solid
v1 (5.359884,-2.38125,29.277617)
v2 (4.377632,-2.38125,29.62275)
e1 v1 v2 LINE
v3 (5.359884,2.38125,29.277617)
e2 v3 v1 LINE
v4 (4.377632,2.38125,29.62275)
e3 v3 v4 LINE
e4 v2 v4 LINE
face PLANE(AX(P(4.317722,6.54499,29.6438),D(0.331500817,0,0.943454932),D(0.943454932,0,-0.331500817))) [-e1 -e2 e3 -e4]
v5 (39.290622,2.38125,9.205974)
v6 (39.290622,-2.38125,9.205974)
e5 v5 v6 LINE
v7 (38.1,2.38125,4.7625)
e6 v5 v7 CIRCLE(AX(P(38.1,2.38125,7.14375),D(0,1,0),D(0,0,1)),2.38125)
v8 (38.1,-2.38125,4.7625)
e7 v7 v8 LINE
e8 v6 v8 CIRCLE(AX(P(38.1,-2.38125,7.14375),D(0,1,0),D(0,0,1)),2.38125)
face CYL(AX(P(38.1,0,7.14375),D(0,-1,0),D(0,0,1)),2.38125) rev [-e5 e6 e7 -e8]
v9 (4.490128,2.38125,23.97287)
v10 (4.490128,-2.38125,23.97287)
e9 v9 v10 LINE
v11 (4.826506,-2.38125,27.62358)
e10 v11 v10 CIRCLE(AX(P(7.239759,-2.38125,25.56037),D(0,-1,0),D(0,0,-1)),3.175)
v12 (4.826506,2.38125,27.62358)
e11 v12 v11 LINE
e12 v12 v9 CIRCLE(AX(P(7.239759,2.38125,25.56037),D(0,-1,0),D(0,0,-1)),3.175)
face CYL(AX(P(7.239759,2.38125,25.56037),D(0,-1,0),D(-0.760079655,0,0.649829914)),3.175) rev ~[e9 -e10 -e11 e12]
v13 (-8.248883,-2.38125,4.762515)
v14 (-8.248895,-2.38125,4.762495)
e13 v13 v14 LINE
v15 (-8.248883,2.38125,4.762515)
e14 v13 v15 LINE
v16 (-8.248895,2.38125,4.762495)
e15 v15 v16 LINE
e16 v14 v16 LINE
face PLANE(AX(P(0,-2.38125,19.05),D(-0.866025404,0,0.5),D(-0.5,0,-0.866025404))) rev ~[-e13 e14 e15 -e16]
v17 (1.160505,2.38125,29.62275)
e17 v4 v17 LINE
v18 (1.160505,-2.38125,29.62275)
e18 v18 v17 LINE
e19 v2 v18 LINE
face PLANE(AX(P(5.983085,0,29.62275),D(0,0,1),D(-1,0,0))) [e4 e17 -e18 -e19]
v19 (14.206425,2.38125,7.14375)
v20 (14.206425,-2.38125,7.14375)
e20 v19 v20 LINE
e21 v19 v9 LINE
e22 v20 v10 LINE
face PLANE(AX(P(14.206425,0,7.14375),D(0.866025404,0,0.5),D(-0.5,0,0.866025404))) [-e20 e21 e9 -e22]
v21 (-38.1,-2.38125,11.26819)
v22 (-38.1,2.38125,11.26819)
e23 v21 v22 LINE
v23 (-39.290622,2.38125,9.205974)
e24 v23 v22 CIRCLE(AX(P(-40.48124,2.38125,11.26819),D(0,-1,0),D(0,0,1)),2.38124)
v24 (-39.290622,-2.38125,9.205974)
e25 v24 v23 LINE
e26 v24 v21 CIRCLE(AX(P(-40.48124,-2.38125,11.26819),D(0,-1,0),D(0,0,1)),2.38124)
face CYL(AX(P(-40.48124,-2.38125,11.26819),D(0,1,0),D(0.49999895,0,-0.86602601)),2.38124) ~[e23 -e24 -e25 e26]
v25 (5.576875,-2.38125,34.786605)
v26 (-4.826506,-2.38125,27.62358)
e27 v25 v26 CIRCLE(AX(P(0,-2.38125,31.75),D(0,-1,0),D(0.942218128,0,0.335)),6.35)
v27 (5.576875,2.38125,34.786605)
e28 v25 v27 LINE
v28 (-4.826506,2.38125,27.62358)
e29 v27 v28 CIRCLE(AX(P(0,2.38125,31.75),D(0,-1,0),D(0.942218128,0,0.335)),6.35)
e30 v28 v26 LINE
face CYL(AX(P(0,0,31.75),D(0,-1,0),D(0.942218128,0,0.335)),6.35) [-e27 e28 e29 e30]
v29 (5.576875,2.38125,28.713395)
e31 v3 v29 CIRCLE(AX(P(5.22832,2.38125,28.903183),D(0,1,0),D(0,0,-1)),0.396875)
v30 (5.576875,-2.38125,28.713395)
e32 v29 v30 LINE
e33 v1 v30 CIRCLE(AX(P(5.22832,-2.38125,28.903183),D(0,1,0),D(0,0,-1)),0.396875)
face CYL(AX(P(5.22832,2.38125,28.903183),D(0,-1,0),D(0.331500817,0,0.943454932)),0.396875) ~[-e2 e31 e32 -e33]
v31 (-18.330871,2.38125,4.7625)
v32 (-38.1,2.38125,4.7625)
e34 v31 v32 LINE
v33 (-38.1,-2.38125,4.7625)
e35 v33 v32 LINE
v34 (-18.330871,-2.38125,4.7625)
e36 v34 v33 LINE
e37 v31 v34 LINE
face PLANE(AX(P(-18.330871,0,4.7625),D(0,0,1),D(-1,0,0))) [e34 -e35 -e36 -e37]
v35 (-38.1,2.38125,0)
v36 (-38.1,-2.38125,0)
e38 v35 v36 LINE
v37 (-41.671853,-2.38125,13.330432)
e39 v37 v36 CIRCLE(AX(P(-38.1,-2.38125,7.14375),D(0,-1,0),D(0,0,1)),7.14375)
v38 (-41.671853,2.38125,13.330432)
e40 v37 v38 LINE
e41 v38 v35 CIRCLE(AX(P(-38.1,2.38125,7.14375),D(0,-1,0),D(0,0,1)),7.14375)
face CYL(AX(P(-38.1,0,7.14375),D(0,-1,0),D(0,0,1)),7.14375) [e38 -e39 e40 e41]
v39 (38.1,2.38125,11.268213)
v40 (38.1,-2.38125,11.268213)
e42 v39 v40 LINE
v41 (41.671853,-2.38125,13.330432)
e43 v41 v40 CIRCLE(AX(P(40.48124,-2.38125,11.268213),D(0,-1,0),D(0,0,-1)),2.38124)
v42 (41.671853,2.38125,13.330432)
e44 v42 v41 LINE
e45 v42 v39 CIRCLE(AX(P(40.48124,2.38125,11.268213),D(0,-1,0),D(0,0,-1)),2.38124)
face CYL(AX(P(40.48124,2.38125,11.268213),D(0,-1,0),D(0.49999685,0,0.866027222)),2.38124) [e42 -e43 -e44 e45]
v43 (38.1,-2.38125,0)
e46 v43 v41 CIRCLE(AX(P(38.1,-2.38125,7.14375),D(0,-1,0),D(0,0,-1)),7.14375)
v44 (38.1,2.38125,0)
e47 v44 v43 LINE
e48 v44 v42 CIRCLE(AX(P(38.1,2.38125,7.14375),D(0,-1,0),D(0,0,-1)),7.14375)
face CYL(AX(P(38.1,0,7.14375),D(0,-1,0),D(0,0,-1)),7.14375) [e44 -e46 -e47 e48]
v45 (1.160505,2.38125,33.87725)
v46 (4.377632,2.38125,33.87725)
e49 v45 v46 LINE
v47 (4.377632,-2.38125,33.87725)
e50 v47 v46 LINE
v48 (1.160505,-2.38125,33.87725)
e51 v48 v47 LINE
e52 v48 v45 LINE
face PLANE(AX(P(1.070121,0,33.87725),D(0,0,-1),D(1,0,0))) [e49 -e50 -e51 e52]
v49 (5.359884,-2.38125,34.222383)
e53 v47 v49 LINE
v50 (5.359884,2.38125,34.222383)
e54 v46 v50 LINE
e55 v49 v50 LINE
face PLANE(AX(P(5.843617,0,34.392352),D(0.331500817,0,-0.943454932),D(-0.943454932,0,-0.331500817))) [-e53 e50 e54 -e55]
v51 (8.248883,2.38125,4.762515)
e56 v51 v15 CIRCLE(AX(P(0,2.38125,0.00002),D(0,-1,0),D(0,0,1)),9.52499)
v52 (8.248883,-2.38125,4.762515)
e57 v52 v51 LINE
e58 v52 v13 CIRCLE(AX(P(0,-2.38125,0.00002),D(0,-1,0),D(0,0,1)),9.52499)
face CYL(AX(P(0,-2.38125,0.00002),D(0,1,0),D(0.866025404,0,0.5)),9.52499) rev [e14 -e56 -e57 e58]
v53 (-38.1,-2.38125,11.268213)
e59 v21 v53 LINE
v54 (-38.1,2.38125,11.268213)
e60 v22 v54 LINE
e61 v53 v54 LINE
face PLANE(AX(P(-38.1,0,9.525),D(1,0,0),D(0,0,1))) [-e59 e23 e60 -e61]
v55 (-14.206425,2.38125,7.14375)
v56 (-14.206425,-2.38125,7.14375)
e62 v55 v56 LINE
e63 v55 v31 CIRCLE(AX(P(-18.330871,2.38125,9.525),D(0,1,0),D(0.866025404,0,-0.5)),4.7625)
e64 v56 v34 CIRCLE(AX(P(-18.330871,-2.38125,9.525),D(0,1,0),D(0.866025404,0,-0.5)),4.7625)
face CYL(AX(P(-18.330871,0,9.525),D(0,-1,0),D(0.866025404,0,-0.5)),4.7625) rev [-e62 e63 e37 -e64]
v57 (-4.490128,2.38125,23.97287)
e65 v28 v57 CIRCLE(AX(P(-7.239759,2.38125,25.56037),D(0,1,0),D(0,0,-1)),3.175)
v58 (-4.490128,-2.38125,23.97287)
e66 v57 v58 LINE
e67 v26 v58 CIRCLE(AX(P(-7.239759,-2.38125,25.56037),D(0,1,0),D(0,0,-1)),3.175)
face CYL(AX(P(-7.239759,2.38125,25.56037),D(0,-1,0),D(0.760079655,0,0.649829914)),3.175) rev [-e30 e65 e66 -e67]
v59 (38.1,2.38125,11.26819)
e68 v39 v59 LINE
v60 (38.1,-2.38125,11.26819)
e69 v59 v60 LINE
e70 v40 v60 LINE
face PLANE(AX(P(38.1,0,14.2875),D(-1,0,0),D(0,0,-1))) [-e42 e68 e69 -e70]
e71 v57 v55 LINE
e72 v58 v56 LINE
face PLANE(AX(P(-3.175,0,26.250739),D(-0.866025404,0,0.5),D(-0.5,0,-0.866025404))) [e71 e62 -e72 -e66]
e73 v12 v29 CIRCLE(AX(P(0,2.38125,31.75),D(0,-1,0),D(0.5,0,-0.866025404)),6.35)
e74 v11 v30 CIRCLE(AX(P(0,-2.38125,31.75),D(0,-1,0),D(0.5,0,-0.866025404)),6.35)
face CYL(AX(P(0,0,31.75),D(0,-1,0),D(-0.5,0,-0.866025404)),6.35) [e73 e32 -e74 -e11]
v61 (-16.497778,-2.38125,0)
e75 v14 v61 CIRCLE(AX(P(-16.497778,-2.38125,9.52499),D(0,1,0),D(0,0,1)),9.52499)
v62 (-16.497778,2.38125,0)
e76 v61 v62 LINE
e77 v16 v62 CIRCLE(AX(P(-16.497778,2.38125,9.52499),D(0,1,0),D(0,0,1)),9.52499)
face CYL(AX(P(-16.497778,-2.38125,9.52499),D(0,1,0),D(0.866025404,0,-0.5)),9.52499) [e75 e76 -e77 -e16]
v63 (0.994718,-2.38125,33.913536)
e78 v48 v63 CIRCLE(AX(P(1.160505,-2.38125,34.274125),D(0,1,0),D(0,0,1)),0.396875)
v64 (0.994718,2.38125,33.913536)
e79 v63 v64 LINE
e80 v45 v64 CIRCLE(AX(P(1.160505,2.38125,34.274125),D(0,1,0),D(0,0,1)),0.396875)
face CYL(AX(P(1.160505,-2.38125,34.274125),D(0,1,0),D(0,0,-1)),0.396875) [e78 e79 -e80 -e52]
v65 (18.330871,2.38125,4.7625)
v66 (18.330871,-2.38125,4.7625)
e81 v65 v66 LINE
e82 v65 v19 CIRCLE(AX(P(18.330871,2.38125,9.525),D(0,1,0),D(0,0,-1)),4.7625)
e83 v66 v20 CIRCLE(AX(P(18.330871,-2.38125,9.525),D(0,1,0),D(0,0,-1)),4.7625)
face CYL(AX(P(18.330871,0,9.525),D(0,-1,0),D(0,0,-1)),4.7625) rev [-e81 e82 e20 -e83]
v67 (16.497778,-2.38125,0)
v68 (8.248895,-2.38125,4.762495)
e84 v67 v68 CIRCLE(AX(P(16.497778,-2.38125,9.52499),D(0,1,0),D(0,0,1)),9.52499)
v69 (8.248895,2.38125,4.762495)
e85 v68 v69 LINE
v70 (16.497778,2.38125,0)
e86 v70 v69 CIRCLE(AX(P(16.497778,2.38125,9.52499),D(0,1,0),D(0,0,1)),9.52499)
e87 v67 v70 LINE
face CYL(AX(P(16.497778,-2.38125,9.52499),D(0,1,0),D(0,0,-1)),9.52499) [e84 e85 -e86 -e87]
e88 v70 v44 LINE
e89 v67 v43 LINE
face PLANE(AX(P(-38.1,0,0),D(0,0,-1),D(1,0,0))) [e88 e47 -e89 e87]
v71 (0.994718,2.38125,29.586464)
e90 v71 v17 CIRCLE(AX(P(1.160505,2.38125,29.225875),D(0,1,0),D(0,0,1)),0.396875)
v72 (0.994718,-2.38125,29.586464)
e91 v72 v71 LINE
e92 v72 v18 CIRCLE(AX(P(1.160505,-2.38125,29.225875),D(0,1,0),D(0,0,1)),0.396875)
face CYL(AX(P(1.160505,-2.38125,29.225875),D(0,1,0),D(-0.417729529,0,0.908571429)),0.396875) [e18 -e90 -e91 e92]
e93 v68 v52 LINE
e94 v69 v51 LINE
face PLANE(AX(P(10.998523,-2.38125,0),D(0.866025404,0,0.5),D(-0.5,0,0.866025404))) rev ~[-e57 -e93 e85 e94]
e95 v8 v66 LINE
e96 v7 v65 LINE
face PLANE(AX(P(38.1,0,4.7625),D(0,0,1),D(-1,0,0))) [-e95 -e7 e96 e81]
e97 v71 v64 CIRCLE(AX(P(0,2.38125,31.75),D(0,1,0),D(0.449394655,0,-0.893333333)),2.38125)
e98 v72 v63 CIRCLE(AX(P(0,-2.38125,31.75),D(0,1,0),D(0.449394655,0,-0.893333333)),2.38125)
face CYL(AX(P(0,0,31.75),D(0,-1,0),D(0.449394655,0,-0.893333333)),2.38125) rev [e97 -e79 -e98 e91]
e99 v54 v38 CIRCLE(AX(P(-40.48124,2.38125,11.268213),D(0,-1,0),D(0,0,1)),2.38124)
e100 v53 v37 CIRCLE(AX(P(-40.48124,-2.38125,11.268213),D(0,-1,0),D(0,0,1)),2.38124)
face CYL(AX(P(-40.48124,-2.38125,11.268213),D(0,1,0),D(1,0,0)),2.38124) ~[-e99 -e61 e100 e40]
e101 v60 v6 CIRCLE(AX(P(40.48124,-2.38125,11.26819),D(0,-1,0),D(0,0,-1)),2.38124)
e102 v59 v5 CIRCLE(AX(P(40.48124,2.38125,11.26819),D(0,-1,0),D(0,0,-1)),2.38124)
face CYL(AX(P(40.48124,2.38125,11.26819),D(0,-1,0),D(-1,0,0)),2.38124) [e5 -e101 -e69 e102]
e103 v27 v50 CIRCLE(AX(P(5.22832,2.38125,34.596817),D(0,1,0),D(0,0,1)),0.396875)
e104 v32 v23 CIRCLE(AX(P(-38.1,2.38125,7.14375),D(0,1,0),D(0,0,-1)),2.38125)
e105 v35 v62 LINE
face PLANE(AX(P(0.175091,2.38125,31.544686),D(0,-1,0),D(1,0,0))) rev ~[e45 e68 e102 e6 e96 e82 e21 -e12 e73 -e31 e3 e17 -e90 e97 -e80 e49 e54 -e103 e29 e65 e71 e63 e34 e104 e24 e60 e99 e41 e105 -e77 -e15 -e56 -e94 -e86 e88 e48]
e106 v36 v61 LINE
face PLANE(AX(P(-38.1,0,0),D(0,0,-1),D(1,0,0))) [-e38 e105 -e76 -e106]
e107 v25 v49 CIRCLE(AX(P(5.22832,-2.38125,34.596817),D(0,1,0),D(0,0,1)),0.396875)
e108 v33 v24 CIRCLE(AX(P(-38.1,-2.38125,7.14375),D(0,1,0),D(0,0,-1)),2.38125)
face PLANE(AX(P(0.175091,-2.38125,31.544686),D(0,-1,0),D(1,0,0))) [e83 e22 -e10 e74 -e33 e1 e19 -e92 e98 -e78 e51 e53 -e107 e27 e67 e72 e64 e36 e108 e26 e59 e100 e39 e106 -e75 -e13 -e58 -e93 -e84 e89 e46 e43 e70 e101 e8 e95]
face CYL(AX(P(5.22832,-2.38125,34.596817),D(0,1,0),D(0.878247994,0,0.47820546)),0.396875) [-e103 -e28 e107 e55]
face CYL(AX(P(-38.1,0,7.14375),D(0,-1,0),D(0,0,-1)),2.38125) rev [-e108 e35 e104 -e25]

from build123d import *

# Parameters (mm, degrees)
F1_DEPTH    = 2.38125
F2_DEPTH    = 2.38125
F3_T1_DEPTH = 6.5449897521
F3_T3_DEPTH = 6.5449897521
F4_T1_DEPTH = 13.0899795043
F5_R        = 0.396875
F6_R        = 3.175
F7_R        = 2.38124
F9_DEPTH    = 4.7635
F10_R       = 9.52499


# Not quite as in the source:
# - a fillet or chamfer that OpenCascade refuses, or shapes differently, is made with other operations: its cross-section is extruded or revolved along the edge and cut away or added
# - a fillet or chamfer is up to 0.001 mm smaller than in the source, because OpenCascade refuses the exact size


with BuildPart() as f1:
    # F0 (on Front) → F1 (new body, symmetric)
    with BuildSketch(Plane.XZ):
        with BuildLine():
            ThreePointArc((-38.1, 14.2875), (-45.24375, 7.14375), (-38.1, 0))
            Line((-38.1, 0), (38.1, 0))
            ThreePointArc((38.1, 0), (45.24375, 7.14375), (38.1, 14.2875))
            Line((38.1, 14.2875), (38.1, 9.525))
            ThreePointArc((38.1, 9.525), (40.48125, 7.14375), (38.1, 4.7625))
            Line((38.1, 4.7625), (18.3308710468, 4.7625))
            ThreePointArc((18.3308710468, 4.7625), (15.9496210468, 5.4005540145), (14.2064250612, 7.14375))
            Line((14.2064250612, 7.14375), (3.175, 26.250738686))
            ThreePointArc((3.175, 26.250738686), (0, 25.4), (-3.175, 26.250738686))
            Line((-3.175, 26.250738686), (-14.2064250612, 7.14375))
            ThreePointArc((-14.2064250612, 7.14375), (-15.9496210468, 5.4005540145), (-18.3308710468, 4.7625))
            Line((-18.3308710468, 4.7625), (-38.1, 4.7625))
            ThreePointArc((-38.1, 4.7625), (-40.48125, 7.14375), (-38.1, 9.525))
            Line((-38.1, 9.525), (-38.1, 14.2875))
        make_face()
    extrude(amount=F1_DEPTH, both=True)

    # F0 (on Front) → F2 (join, symmetric)
    with BuildSketch(Plane.XZ):
        with BuildLine():
            ThreePointArc((5.9830851103, 33.87725), (-4.0635273104, 36.6295743459), (-3.175, 26.250738686))
            ThreePointArc((-3.175, 26.250738686), (0, 25.4), (3.175, 26.250738686))
            ThreePointArc((3.175, 26.250738686), (4.8795743459, 27.6864726896), (5.9830851103, 29.62275))
            Line((5.9830851103, 29.62275), (1.0701210212, 29.62275))
            ThreePointArc((1.0701210212, 29.62275), (-2.38125, 31.75), (1.0701210212, 33.87725))
            Line((1.0701210212, 33.87725), (5.9830851103, 33.87725))
        make_face()
    extrude(amount=F2_DEPTH, both=True)

    # F3: chamfer of 0.396875 x 1.5875 on 2 edges, made by hand

    # F3_s2 → F3_t1 (cut)
    with BuildSketch(Plane.XZ):
        with BuildLine():
            Line((5.8436173462, 34.3923519359), (4.3177222428, 33.8561996981))
            Line((4.3177222428, 33.8561996981), (4.3177222428, 33.8244496981))
            ThreePointArc((4.3177222428, 33.8244496981), (5.1504036766, 33.8455), (5.9830851103, 33.8455))
            Line((5.9830851103, 33.8455), (6.0130005359, 33.88788625))
            ThreePointArc((6.0130005359, 33.88788625), (5.918565904, 34.1369039994), (5.872535886, 34.405458444))
            Line((5.872535886, 34.405458444), (5.8436173462, 34.3923519359))
        make_face()
    extrude(amount=F3_T1_DEPTH, mode=Mode.SUBTRACT)

    # F3_s4 → F3_t3 (cut)
    with BuildSketch(Plane.XZ.offset(-6.5449897521)):
        with BuildLine():
            Line((5.8436173462, 34.3923519359), (4.3177222428, 33.8561996981))
            Line((4.3177222428, 33.8561996981), (4.3177222428, 33.8244496981))
            ThreePointArc((4.3177222428, 33.8244496981), (5.1504036766, 33.8455), (5.9830851103, 33.8455))
            Line((5.9830851103, 33.8455), (6.0130005359, 33.88788625))
            ThreePointArc((6.0130005359, 33.88788625), (5.918565904, 34.1369039994), (5.872535886, 34.405458444))
            Line((5.872535886, 34.405458444), (5.8436173462, 34.3923519359))
        make_face()
    extrude(amount=F3_T3_DEPTH, mode=Mode.SUBTRACT)

    # F4: chamfer of 1.5875 x 0.396875 on 1 edges, made by hand

    # F4_s2 → F4_t1 (cut)
    with BuildSketch(Plane.XZ.offset(-6.5449897521)):
        with BuildLine():
            Line((4.3177222428, 29.6438003019), (5.8436173462, 29.1076480641))
            Line((5.8436173462, 29.1076480641), (5.872535886, 29.094541556))
            ThreePointArc((5.872535886, 29.094541556), (5.918565904, 29.3630960006), (6.0130005359, 29.61211375))
            Line((6.0130005359, 29.61211375), (5.9830851103, 29.6545))
            ThreePointArc((5.9830851103, 29.6545), (5.1504036766, 29.6545), (4.3177222428, 29.6755503019))
            Line((4.3177222428, 29.6755503019), (4.3177222428, 29.6438003019))
        make_face()
    extrude(amount=F4_T1_DEPTH, mode=Mode.SUBTRACT)

    # F5
    f5_edges = [f1.edges().sort_by_distance(p)[0] for p in [
        (5.783708, 0, 34.371302),
        (5.783708, 0, 29.128698),
        (1.070121, 0, 29.62275),
        (1.070121, 0, 33.87725),
    ]]
    fillet(f5_edges, radius=F5_R)

    # F6
    f6_edges = [f1.edges().sort_by_distance(p)[0] for p in [
        (3.175, 0, 26.250739),
        (-3.175, 0, 26.250739),
    ]]
    fillet(f6_edges, radius=F6_R)

    # F7 (radius 2.38125 in the source; OpenCascade refuses exactly that, so slightly less here)
    f7_edges = [f1.edges().sort_by_distance(p)[0] for p in [
        (38.1, 0, 14.2875),
        (38.1, 0, 9.525),
        (-38.1, 0, 14.2875),
        (-38.1, 0, 9.525),
    ]]
    fillet(f7_edges, radius=F7_R)

    # F8 (on face) → F9 (cut, through all)
    with BuildSketch(Plane.XZ.offset(2.38125)):
        Polygon((10.9985226281, 0), (0, 19.05), (-10.9985226281, 0), align=None)
    extrude(amount=-F9_DEPTH, mode=Mode.SUBTRACT)

    # F10 (radius 9.525 in the source; OpenCascade refuses exactly that, so slightly less here)
    f10_edges = [f1.edges().sort_by_distance(p)[0] for p in [
        (0, 0, 19.05),
        (10.998523, 0, 0),
        (-10.998523, 0, 0),
    ]]
    fillet(f10_edges, radius=F10_R)


solid = f1.part
